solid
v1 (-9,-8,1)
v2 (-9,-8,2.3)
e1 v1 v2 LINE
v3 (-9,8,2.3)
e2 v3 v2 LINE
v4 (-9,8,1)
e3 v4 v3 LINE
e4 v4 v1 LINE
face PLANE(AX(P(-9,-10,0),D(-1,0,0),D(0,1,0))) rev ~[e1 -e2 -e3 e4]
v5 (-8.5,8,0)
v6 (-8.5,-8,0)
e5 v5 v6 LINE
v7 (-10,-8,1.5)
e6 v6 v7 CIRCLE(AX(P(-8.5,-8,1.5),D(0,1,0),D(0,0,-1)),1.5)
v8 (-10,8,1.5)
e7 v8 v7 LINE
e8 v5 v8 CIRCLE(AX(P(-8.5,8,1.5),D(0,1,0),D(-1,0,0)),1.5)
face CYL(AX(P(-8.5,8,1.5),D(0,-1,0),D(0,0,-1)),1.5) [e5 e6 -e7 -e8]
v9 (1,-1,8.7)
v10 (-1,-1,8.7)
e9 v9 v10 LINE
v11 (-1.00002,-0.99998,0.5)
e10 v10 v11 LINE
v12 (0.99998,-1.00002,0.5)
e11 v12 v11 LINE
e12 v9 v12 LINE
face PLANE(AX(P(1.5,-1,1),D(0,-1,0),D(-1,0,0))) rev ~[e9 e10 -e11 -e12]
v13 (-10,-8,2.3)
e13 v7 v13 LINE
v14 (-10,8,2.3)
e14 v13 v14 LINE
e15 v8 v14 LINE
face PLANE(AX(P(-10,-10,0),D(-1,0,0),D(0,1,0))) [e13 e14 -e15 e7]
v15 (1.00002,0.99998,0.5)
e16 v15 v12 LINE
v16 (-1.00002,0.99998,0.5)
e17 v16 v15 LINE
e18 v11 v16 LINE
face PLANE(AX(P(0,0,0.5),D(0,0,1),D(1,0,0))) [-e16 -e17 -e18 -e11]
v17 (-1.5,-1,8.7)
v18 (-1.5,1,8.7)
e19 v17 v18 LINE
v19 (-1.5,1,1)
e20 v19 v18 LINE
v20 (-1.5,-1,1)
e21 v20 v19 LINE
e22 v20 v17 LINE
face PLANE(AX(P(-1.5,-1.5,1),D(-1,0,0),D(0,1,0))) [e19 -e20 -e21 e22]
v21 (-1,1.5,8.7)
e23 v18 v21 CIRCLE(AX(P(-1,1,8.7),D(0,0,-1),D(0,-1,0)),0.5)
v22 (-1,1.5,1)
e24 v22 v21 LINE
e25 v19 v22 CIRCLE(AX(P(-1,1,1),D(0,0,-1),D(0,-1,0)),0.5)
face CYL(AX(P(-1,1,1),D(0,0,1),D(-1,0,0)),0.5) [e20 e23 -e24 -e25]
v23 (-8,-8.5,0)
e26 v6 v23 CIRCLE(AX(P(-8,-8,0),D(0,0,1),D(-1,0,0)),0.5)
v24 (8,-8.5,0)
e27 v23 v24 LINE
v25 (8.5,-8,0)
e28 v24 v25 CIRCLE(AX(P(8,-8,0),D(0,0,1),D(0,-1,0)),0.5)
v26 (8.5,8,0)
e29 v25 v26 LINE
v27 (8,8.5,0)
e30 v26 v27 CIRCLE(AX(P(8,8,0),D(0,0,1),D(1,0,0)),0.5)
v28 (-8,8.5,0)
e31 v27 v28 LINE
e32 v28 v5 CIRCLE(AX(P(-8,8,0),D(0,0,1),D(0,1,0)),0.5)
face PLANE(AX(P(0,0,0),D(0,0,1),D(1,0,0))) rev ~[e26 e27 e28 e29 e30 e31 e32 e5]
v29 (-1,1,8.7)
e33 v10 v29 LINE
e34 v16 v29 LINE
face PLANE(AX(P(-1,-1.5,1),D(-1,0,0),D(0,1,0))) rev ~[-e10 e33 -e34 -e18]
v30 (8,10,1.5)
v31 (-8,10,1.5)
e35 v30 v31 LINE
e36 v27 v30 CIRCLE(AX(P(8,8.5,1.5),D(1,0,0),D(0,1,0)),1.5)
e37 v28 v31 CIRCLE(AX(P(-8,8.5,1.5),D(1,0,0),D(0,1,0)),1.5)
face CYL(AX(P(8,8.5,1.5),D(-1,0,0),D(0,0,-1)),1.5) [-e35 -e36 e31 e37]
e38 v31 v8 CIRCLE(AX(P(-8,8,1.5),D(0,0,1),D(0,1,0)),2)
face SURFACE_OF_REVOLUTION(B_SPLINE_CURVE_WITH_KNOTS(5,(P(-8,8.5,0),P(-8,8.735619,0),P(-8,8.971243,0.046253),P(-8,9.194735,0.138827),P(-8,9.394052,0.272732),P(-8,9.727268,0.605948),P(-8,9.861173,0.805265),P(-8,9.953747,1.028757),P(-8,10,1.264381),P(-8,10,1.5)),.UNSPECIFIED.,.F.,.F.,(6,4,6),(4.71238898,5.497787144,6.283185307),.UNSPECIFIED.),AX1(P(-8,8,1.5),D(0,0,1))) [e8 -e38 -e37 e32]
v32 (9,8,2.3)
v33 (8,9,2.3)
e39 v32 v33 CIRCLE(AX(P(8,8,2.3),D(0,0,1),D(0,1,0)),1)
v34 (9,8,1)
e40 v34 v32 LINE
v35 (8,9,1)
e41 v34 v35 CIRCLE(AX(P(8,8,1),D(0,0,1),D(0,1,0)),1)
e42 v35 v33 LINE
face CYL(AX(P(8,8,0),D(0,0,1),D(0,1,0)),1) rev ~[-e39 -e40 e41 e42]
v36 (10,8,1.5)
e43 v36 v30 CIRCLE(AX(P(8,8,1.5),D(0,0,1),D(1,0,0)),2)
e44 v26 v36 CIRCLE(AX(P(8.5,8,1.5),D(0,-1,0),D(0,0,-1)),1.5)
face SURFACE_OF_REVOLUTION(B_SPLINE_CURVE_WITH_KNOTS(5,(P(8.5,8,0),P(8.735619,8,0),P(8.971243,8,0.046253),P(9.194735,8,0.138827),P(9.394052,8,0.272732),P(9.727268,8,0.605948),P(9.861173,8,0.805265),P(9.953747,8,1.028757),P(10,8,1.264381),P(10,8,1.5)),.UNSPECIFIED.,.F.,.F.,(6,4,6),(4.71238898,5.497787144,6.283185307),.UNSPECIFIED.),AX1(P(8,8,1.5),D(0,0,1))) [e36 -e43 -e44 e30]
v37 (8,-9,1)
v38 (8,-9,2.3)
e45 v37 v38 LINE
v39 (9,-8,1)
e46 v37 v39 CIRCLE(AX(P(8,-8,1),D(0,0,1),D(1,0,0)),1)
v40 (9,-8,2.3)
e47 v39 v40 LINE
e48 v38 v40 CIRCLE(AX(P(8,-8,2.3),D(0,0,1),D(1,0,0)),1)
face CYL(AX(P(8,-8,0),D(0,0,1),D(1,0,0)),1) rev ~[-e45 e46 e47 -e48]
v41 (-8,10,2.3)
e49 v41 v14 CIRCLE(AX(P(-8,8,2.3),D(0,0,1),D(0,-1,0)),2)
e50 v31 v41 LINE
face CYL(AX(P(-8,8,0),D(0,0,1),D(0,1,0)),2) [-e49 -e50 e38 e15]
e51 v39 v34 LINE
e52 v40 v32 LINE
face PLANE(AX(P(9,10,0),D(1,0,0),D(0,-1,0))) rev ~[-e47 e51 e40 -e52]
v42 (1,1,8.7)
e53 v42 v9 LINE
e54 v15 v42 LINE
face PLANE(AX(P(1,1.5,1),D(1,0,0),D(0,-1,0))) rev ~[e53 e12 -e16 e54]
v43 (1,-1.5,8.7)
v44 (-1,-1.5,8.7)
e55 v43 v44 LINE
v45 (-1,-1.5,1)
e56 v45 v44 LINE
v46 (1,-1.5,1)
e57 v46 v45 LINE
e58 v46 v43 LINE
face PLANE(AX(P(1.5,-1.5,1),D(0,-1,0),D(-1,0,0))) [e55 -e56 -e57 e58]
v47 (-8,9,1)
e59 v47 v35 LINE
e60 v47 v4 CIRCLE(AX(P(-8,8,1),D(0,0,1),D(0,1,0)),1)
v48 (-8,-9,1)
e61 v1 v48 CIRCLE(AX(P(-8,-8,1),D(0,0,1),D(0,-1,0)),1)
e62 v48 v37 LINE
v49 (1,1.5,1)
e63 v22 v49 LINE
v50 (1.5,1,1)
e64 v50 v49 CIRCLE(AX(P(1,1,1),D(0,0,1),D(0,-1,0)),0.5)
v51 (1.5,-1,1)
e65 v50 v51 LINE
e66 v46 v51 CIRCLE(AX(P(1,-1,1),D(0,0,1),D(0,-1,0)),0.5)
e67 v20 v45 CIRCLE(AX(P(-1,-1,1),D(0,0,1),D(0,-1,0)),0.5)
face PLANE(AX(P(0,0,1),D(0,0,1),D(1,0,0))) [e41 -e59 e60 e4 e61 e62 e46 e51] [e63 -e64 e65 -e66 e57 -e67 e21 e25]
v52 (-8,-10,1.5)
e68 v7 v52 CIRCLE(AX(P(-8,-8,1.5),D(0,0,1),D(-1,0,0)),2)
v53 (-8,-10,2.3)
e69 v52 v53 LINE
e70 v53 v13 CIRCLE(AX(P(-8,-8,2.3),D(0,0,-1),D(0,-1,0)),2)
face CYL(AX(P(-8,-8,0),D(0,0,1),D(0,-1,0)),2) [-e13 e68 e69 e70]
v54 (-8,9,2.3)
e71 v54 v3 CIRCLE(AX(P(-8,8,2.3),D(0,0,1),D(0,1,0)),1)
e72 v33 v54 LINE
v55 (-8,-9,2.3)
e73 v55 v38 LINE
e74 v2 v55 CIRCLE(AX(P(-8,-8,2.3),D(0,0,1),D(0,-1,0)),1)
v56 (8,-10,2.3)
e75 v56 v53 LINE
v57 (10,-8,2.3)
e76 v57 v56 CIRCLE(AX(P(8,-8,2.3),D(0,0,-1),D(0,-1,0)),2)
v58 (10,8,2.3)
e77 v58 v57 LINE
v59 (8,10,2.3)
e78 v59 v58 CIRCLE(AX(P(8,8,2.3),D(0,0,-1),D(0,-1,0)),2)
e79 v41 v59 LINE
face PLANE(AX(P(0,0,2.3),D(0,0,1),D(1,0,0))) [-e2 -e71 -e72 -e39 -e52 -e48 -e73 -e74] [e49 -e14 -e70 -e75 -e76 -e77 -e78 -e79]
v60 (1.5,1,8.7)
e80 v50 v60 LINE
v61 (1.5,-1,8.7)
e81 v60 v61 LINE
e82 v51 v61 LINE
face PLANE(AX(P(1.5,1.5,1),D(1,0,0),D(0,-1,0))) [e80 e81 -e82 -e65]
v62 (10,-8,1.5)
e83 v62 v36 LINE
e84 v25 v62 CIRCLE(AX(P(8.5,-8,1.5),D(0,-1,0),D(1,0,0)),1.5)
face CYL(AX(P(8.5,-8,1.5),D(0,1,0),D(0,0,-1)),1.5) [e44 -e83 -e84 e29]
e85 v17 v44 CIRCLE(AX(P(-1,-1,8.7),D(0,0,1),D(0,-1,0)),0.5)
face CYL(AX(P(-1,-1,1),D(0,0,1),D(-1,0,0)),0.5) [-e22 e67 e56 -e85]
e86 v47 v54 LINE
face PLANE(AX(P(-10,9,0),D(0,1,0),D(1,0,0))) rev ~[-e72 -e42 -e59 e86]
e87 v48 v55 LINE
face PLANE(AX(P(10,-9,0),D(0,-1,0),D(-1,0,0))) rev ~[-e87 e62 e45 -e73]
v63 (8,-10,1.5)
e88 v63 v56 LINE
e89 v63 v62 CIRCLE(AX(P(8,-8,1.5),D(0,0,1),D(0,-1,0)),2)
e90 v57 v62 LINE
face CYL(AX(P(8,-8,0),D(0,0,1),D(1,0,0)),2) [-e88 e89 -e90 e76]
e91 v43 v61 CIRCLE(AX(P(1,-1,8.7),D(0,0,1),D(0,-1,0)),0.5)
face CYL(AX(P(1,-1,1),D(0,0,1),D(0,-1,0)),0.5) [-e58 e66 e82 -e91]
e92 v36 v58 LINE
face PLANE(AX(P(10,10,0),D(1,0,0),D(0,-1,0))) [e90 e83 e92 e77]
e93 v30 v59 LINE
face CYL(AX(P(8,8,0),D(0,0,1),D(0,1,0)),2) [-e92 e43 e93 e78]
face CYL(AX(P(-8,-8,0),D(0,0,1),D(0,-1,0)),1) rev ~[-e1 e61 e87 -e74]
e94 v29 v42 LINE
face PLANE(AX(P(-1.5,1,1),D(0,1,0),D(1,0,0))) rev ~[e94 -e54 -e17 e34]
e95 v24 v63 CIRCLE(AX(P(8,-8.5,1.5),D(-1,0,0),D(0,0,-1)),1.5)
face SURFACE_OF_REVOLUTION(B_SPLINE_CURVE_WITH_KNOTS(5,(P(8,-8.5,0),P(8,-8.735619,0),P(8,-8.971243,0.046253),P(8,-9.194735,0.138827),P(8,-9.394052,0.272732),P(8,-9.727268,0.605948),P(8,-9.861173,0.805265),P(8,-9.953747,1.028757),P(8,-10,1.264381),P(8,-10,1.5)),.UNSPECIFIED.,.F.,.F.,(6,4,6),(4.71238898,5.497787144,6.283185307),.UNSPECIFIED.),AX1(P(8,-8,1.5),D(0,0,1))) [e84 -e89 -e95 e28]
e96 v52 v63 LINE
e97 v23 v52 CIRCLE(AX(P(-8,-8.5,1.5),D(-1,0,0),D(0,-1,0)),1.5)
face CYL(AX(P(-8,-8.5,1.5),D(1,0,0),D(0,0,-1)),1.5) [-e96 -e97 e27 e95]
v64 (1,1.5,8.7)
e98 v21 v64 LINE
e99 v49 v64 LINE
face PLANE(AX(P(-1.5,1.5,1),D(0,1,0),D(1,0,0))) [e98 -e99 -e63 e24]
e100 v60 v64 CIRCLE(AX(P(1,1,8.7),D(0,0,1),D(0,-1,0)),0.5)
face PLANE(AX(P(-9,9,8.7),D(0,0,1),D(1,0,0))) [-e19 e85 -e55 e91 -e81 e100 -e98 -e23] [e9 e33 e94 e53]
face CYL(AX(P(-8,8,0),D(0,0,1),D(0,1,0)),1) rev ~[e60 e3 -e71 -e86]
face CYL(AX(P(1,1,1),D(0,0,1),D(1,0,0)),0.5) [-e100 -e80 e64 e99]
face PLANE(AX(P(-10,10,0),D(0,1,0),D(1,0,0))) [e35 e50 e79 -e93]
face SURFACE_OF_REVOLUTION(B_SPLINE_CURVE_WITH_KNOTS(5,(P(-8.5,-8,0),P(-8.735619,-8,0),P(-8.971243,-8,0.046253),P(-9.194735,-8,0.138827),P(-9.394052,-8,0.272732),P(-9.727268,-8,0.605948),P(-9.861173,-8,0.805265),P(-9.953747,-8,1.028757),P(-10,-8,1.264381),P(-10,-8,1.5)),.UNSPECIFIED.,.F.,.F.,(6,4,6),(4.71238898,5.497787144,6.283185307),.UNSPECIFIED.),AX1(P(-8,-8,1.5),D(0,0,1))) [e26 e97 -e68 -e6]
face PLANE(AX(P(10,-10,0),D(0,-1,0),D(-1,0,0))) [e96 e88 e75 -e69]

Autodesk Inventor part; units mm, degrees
ref_plane "YZ Plane" through (0, 0, 0) normal (1, 0, 0) x (0, 1, 0)
ref_plane "XZ Plane" through (0, 0, 0) normal (0, 1, 0) x (-1, 0, 0)
ref_plane "XY Plane" through (0, 0, 0) normal (0, 0, 1) x (1, 0, 0)
sketch "Skizze1" plane through (0, 0, 0) normal (0, 0, 1) x (1, 0, 0)
  line L0 (-10, 10) -> (10, 10)
  line L1 (10, 10) -> (10, -10)
  line L2 (10, -10) -> (-10, -10)
  line L3 (-10, -10) -> (-10, 10)
  line L4 (-10, 10) -> (10, -10) construction
  line L5 (10, 10) -> (-10, -10) construction
  point P0 (0, 0)
  dimension "d0" = 20
  dimension "d1" = 20
extrude "Extrusion1" add sketch "Skizze1" along normal blind 2.3
fillet "Rundung1" radius 2 4 edges at (10, 10, 1.15) (-10, 10, 1.15) (10, -10, 1.15) (-10, -10, 1.15)
shell "Wandung1" thickness 1 removed faces 1 at (-2.6667, -2, 2.3)
fillet "Rundung2" radius 1.5 8 edges at (-9.4142, 9.4142, 0) (-10, 0, 0) (-9.4142, -9.4142, 0) (0, -10, 0) (9.4142, -9.4142, 0) (10, 0, 0) (9.4142, 9.4142, 0) (0, 10, 0)
sketch "Skizze2" plane through (-9, 9, 1) normal (0, 0, 1) x (1, 0, 0)
  line L0 (7.5, -7.5) -> (10.5, -7.5)
  line L1 (10.5, -7.5) -> (10.5, -10.5)
  line L2 (10.5, -10.5) -> (7.5, -10.5)
  line L3 (7.5, -10.5) -> (7.5, -7.5)
  line L4 (7.5, -7.5) -> (10.5, -10.5) construction
  line L5 (10.5, -7.5) -> (7.5, -10.5) construction
  point P0 (9, -9)
  dimension "d7" = 3
  dimension "d8" = 3
extrude "Extrusion2" add sketch "Skizze2" along normal blind 7.7
fillet "Rundung3" radius 0.5 4 edges at (1.5, 1.5, 4.85) (-1.5, 1.5, 4.85) (1.5, -1.5, 4.85) (-1.5, -1.5, 4.85)
shell "Wandung2" thickness 0.5 removed faces 1 at (0.3333, -0.5, 8.7)
properties part number "Abdeckkappe 5 20x20"
